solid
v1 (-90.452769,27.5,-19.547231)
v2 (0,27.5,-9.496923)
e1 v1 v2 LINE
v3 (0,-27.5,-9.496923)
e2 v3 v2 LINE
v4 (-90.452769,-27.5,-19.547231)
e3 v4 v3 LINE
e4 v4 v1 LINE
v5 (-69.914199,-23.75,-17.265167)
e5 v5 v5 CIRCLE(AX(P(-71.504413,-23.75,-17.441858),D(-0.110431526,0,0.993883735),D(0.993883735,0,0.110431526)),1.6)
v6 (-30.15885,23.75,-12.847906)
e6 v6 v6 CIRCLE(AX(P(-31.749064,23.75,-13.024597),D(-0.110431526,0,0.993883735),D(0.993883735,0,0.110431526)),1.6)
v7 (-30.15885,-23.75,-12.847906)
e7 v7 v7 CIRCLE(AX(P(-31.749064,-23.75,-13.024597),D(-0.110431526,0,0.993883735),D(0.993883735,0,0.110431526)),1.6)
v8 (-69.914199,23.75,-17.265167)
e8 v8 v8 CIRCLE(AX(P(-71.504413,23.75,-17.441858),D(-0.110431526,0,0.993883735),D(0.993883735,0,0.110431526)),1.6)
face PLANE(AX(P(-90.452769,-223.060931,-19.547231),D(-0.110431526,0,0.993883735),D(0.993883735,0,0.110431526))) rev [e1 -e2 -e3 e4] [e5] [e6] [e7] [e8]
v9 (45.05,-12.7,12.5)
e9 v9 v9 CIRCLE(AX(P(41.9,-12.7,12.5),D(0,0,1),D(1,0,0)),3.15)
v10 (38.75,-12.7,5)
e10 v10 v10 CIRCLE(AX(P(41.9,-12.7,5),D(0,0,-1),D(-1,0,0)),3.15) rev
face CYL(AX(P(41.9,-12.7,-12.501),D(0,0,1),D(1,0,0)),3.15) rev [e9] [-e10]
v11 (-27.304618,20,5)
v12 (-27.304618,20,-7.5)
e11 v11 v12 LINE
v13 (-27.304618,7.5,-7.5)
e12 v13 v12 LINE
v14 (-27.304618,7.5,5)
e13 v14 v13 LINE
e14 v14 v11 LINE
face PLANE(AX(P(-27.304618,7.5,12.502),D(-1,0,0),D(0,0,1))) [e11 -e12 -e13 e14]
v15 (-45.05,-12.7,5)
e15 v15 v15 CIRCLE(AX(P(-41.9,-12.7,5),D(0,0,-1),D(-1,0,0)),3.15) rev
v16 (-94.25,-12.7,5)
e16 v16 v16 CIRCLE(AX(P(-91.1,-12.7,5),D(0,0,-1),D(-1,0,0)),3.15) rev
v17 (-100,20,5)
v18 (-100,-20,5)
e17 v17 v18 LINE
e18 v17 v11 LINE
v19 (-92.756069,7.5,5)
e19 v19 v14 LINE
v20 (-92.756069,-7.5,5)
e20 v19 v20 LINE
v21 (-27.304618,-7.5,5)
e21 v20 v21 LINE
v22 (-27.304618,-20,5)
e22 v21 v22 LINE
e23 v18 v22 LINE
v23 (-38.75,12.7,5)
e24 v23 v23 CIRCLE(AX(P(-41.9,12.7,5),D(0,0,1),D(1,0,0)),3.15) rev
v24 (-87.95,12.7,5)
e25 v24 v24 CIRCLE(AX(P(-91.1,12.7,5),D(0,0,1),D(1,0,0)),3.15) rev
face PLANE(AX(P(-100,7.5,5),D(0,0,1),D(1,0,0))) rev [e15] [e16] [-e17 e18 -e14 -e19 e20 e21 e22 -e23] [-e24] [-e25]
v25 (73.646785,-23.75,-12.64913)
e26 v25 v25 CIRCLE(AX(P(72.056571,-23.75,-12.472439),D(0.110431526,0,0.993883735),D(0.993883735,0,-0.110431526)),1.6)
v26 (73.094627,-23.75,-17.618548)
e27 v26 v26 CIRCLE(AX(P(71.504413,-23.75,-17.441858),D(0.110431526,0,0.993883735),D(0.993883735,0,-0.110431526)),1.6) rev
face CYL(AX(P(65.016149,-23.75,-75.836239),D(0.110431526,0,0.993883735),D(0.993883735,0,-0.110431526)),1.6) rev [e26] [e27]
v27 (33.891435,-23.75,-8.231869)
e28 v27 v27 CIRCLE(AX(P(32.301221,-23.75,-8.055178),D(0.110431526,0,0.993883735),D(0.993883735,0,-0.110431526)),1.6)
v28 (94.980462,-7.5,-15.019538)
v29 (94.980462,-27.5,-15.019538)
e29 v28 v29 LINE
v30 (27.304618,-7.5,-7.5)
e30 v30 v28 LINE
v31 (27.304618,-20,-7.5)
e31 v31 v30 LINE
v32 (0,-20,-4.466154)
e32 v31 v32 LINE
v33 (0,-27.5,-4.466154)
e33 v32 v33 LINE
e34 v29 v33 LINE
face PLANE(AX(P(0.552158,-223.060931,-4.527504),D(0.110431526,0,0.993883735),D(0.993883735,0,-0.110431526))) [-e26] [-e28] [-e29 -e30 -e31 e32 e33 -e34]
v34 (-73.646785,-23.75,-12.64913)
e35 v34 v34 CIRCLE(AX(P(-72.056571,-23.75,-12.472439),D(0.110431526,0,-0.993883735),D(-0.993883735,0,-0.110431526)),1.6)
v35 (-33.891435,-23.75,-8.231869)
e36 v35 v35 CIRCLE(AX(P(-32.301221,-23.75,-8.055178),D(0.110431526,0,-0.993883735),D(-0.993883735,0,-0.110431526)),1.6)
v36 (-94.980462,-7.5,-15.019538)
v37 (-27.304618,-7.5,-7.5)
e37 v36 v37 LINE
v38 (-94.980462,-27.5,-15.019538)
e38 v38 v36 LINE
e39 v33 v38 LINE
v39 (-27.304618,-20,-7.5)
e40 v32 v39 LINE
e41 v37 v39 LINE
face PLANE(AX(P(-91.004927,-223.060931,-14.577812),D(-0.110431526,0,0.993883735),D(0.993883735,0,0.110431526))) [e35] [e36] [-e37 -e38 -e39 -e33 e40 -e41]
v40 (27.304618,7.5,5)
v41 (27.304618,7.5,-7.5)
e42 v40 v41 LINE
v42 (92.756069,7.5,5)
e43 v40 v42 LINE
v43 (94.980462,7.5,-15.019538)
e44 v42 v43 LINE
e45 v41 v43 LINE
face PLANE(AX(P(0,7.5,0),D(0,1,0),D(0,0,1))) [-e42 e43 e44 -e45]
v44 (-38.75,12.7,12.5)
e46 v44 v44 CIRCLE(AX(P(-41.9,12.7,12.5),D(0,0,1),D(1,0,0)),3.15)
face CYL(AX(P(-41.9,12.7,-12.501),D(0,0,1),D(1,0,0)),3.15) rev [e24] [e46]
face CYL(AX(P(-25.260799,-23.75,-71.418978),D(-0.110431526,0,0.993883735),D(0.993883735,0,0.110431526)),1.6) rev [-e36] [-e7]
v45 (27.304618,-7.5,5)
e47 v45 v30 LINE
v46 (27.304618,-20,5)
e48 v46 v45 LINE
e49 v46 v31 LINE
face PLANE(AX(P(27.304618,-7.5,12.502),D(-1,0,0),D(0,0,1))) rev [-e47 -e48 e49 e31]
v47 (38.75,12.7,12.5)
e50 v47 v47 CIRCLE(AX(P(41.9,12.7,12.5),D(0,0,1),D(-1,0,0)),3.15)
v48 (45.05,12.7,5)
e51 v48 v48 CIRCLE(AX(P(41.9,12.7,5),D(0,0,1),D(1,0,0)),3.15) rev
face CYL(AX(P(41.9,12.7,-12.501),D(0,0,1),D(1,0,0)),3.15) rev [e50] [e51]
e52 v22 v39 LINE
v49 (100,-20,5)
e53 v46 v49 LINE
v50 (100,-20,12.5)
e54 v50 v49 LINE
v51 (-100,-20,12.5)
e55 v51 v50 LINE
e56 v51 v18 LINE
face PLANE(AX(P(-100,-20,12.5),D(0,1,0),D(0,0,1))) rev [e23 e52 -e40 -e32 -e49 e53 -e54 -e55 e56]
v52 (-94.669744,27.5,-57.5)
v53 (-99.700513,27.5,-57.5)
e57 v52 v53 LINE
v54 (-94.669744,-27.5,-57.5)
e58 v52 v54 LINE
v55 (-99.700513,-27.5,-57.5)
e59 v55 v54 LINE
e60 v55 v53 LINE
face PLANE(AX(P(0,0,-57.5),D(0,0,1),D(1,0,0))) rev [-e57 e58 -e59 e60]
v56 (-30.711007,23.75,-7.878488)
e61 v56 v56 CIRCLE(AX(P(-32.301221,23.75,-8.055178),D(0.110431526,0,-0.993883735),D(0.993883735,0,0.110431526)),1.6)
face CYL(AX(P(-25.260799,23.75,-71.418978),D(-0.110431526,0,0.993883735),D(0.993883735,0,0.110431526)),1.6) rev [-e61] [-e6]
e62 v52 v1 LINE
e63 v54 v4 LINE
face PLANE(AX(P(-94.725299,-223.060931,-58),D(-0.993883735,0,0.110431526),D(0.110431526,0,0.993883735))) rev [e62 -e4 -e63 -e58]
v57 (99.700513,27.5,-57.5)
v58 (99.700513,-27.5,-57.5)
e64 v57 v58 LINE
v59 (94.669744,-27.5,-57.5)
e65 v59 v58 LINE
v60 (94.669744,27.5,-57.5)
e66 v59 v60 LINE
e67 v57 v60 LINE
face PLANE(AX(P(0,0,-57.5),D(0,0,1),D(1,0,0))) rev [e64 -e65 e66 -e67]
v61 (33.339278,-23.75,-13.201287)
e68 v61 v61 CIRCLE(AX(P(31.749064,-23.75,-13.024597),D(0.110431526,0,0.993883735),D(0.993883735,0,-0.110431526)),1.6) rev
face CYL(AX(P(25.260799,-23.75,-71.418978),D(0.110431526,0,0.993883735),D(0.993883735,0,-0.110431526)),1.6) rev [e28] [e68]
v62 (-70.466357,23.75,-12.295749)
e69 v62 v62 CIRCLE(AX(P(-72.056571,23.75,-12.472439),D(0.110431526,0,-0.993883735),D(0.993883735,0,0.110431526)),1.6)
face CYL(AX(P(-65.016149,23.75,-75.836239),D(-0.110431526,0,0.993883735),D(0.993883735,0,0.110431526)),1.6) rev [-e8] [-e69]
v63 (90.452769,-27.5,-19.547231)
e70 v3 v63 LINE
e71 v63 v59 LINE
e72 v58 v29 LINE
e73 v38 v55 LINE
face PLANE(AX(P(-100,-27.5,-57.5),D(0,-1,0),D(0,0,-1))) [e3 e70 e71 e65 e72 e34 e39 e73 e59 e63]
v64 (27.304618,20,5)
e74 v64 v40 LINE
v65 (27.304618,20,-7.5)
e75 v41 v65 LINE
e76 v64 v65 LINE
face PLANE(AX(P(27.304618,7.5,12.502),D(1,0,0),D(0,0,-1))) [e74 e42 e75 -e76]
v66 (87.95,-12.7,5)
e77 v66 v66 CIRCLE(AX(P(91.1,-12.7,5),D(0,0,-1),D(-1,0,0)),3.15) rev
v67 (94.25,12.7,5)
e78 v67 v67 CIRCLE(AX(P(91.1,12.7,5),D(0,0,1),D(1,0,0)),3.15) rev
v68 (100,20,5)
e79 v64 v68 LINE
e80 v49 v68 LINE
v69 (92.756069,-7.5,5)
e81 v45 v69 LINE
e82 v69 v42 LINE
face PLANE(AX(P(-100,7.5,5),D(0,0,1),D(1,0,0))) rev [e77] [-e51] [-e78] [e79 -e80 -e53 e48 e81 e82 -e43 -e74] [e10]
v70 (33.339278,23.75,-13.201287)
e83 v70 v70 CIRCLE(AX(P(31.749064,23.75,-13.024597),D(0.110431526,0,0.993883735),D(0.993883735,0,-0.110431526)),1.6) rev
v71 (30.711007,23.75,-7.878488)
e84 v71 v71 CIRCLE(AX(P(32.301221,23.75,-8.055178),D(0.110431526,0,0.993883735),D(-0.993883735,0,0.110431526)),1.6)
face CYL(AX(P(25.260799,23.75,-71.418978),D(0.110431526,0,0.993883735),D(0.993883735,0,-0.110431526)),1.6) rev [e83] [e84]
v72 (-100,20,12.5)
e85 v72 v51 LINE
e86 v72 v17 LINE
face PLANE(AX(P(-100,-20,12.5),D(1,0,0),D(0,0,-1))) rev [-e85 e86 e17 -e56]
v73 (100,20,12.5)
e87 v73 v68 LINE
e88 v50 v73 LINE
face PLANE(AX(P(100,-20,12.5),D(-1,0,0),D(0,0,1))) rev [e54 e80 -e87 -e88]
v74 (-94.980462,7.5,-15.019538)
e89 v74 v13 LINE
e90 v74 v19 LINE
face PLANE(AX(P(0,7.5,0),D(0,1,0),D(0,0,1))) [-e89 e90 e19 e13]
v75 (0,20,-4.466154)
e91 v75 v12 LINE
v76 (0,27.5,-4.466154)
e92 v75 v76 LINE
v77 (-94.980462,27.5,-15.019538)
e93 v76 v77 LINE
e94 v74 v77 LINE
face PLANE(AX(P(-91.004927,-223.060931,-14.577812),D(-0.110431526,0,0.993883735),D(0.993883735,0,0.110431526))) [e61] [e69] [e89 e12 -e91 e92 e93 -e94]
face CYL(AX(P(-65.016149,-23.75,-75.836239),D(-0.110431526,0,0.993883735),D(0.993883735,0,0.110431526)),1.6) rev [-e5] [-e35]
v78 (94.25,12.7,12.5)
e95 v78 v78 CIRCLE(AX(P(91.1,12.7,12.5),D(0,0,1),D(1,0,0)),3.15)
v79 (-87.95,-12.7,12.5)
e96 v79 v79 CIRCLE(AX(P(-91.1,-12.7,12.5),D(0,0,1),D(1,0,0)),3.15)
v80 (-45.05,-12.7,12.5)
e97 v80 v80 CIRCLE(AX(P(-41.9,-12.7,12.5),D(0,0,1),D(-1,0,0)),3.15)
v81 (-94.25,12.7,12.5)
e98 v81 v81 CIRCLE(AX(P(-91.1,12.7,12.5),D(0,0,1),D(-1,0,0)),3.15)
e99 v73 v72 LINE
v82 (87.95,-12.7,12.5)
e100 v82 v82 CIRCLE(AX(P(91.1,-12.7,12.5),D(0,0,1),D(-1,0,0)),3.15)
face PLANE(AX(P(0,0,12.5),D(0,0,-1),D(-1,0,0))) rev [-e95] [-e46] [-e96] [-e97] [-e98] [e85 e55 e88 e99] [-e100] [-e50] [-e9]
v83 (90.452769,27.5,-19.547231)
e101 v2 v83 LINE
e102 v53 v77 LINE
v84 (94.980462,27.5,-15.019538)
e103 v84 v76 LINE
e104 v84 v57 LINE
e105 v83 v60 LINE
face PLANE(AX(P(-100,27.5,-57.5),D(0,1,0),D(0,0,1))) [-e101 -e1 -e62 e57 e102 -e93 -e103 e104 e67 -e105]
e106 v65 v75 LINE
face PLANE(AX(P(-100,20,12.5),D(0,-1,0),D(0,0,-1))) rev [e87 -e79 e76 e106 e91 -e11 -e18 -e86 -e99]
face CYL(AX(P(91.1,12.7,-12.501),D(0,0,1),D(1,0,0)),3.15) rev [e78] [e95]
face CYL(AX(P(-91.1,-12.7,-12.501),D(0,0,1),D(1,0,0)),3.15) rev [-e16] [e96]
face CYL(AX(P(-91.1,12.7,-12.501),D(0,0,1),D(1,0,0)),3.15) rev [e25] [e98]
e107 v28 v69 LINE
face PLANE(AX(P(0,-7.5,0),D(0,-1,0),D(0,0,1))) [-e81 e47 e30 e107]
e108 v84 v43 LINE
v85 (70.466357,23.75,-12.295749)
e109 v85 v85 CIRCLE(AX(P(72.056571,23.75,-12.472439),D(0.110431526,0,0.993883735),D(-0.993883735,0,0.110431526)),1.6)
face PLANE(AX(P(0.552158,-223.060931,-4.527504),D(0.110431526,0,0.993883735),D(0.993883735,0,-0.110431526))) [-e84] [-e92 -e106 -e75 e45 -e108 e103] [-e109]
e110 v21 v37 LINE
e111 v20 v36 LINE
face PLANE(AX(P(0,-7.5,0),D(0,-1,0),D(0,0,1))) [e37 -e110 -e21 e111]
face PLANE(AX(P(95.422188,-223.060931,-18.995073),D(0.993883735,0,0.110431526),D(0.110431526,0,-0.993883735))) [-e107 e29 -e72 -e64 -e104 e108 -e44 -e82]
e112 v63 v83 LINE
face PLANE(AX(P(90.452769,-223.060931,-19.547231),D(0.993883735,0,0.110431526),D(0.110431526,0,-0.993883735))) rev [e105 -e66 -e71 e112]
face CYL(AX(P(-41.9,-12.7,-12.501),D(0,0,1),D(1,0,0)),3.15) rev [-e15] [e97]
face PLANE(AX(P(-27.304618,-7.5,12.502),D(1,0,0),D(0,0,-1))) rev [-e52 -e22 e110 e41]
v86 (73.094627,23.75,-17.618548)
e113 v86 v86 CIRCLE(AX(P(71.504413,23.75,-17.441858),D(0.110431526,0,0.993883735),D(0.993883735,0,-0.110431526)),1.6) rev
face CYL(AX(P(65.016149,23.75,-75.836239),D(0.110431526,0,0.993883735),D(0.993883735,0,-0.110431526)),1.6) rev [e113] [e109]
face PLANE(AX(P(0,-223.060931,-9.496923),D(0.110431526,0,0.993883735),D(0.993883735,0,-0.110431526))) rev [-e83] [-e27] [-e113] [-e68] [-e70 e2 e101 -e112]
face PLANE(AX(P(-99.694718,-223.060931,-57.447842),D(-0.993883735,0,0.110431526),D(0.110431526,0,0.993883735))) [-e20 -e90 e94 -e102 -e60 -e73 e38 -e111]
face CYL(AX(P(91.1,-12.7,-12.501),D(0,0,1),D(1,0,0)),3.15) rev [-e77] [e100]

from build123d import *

# Parameters (mm, degrees)
SKETCH1_W                        = 200
SKETCH1_H                        = 40
BOSS_EXTRUDE1_DEPTH              = 12.5
SKETCH3_W                        = 200
SKETCH3_H                        = 12.5
CUT_EXTRUDE1_DEPTH               = 12.5
CUT_EXTRUDE2_REACH               = 107
SKETCH2_R                        = 3.15
SKETCH5_W                        = 200
SKETCH5_H                        = 55
BOSS_EXTRUDE2_DEPTH              = 50
CAVITY1_START                    = -21.65
CAVITY1_DEPTH                    = 43.2999999
CAVITY1_START_2                  = 25.85
CAVITY1_2_DEPTH                  = 1.65
CAVITY1_START_3                  = -27.5
CAVITY1_3_DEPTH                  = 1.6499999
CAVITY1_START_4                  = -25.8500001
CAVITY1_4_DEPTH                  = 51.7000001
CUT_EXTRUDE11_DEPTH              = 55
CUT_EXTRUDE6_REACH               = 216.911
CUT_EXTRUDE6_OFFSET_FROM_SURFACE = 5
SKETCH8_W                        = 62.5
SKETCH8_H                        = 55
CUT_EXTRUDE7_REACH               = 122.136
CUT_EXTRUDE7_OFFSET_FROM_SURFACE = 5
SKETCH9_W                        = 199.70051314
SKETCH9_H                        = 20
CUT_EXTRUDE8_REACH               = 216.911
CUT_EXTRUDE8_OFFSET_FROM_SURFACE = 5
SKETCH11_W                       = 62.5
SKETCH11_H                       = 55
CUT_EXTRUDE9_REACH               = 122.136
CUT_EXTRUDE9_OFFSET_FROM_SURFACE = 5
SKETCH9_2_W                      = 199.70051314
SKETCH9_2_H                      = 20
BOSS_EXTRUDE4_REACH              = 117.136
SKETCH12_W                       = 54.60923652
SKETCH12_H                       = 12.5
BOSS_EXTRUDE5_REACH              = 129.794
CUT_EXTRUDE10_REACH              = 118.931
SKETCH15_R                       = 1.6


with BuildPart() as part:
    # Sketch1 → Boss-Extrude1 (new, symmetric)
    with BuildSketch(Plane.XY):
        Rectangle(SKETCH1_W, SKETCH1_H)
    extrude(amount=BOSS_EXTRUDE1_DEPTH, both=True)

    # Sketch3 → Cut-Extrude1 (cut)
    with BuildSketch(Plane(origin=(0, 20, 0), x_dir=(1, 0, 0), z_dir=(0, 1, 0))):
        with Locations((0, 1.25)):
            Rectangle(SKETCH3_W, SKETCH3_H)
    cut_extrude1 = extrude(amount=-CUT_EXTRUDE1_DEPTH, mode=Mode.SUBTRACT)

    # Mirror1: Cut-Extrude1 across plane
    add(cut_extrude1.mirror(Plane.ZX), mode=Mode.SUBTRACT)

    # Sketch2 → Cut-Extrude2 (cut, up to next)
    with BuildSketch(Plane.XY.offset(12.5), mode=Mode.PRIVATE) as cut_extrude2_sk1:
        with Locations((-91.1, -12.7)):
            Circle(SKETCH2_R)
    cut_extrude2_tool1 = extrude(cut_extrude2_sk1.sketch, amount=-CUT_EXTRUDE2_REACH, mode=Mode.PRIVATE) & part.part
    # Sketch2 → Cut-Extrude2 (cut, up to next)
    with BuildSketch(Plane.XY.offset(12.5), mode=Mode.PRIVATE) as cut_extrude2_sk2:
        with Locations(Location((-41.9, -12.7, 0), (0, 0, 180))):
            Circle(SKETCH2_R)
    cut_extrude2_tool2 = extrude(cut_extrude2_sk2.sketch, amount=-CUT_EXTRUDE2_REACH, mode=Mode.PRIVATE) & part.part
    # Sketch2 → Cut-Extrude2 (cut, up to next)
    with BuildSketch(Plane.XY.offset(12.5), mode=Mode.PRIVATE) as cut_extrude2_sk3:
        with Locations((-41.9, 12.7)):
            Circle(SKETCH2_R)
    cut_extrude2_tool3 = extrude(cut_extrude2_sk3.sketch, amount=-CUT_EXTRUDE2_REACH, mode=Mode.PRIVATE) & part.part
    # Sketch2 → Cut-Extrude2 (cut, up to next)
    with BuildSketch(Plane.XY.offset(12.5), mode=Mode.PRIVATE) as cut_extrude2_sk4:
        with Locations((-91.1, 12.7)):
            Circle(SKETCH2_R)
    cut_extrude2_tool4 = extrude(cut_extrude2_sk4.sketch, amount=-CUT_EXTRUDE2_REACH, mode=Mode.PRIVATE) & part.part
    # Sketch2 → Cut-Extrude2 (cut, up to next)
    with BuildSketch(Plane.XY.offset(12.5), mode=Mode.PRIVATE) as cut_extrude2_sk5:
        with Locations((41.9, -12.7)):
            Circle(SKETCH2_R)
    cut_extrude2_tool5 = extrude(cut_extrude2_sk5.sketch, amount=-CUT_EXTRUDE2_REACH, mode=Mode.PRIVATE) & part.part
    # Sketch2 → Cut-Extrude2 (cut, up to next)
    with BuildSketch(Plane.XY.offset(12.5), mode=Mode.PRIVATE) as cut_extrude2_sk6:
        with Locations(Location((91.1, -12.7, 0), (0, 0, 180))):
            Circle(SKETCH2_R)
    cut_extrude2_tool6 = extrude(cut_extrude2_sk6.sketch, amount=-CUT_EXTRUDE2_REACH, mode=Mode.PRIVATE) & part.part
    # Sketch2 → Cut-Extrude2 (cut, up to next)
    with BuildSketch(Plane.XY.offset(12.5), mode=Mode.PRIVATE) as cut_extrude2_sk7:
        with Locations((91.1, 12.7)):
            Circle(SKETCH2_R)
    cut_extrude2_tool7 = extrude(cut_extrude2_sk7.sketch, amount=-CUT_EXTRUDE2_REACH, mode=Mode.PRIVATE) & part.part
    # Sketch2 → Cut-Extrude2 (cut, up to next)
    with BuildSketch(Plane.XY.offset(12.5), mode=Mode.PRIVATE) as cut_extrude2_sk8:
        with Locations((41.9, 12.7)):
            Circle(SKETCH2_R)
    cut_extrude2_tool8 = extrude(cut_extrude2_sk8.sketch, amount=-CUT_EXTRUDE2_REACH, mode=Mode.PRIVATE) & part.part
    add(cut_extrude2_tool1.solids().sort_by_distance((-91.1, -12.7, 12.5))[0], mode=Mode.SUBTRACT)
    add(cut_extrude2_tool2.solids().sort_by_distance((-41.9, -12.7, 12.5))[0], mode=Mode.SUBTRACT)
    add(cut_extrude2_tool3.solids().sort_by_distance((-41.9, 12.7, 12.5))[0], mode=Mode.SUBTRACT)
    add(cut_extrude2_tool4.solids().sort_by_distance((-91.1, 12.7, 12.5))[0], mode=Mode.SUBTRACT)
    add(cut_extrude2_tool5.solids().sort_by_distance((41.9, -12.7, 12.5))[0], mode=Mode.SUBTRACT)
    add(cut_extrude2_tool6.solids().sort_by_distance((91.1, -12.7, 12.5))[0], mode=Mode.SUBTRACT)
    add(cut_extrude2_tool7.solids().sort_by_distance((91.1, 12.7, 12.5))[0], mode=Mode.SUBTRACT)
    add(cut_extrude2_tool8.solids().sort_by_distance((41.9, 12.7, 12.5))[0], mode=Mode.SUBTRACT)

    # Sketch5 → Boss-Extrude2 (add)
    with BuildSketch(Plane.XY.offset(-7.5)):
        Rectangle(SKETCH5_W, SKETCH5_H)
    extrude(amount=-BOSS_EXTRUDE2_DEPTH)

    # Cavity1: read off the stored shape, not the designer's step
    # Cavity1 outline → Cavity1 (cut)
    with BuildSketch(Plane(origin=(0, 0, 0), x_dir=(1, 0, 0), z_dir=(0, 1, 0)).offset(CAVITY1_START)):
        Polygon((94.166666667, 57.5), (-94.166666667, 57.5), (-90, 20), (0, 10), (90, 20), align=None)
    extrude(amount=CAVITY1_DEPTH, mode=Mode.SUBTRACT)

    # Cavity1 2 outline → Cavity1 2 (cut)
    with BuildSketch(Plane(origin=(0, 0, 0), x_dir=(1, 0, 0), z_dir=(0, 1, 0)).offset(CAVITY1_START_2)):
        Polygon((94.166666667, 57.5), (-94.166666667, 57.5), (-90, 20), (0, 10), (90, 20), align=None)
    extrude(amount=CAVITY1_2_DEPTH, mode=Mode.SUBTRACT)

    # Cavity1 3 outline → Cavity1 3 (cut)
    with BuildSketch(Plane(origin=(0, 0, 0), x_dir=(1, 0, 0), z_dir=(0, 1, 0)).offset(CAVITY1_START_3)):
        Polygon((94.166666667, 57.5), (-94.166666667, 57.5), (-90, 20), (0, 10), (90, 20), align=None)
    extrude(amount=CAVITY1_3_DEPTH, mode=Mode.SUBTRACT)

    # Cavity1 4 outline → Cavity1 4 (cut)
    with BuildSketch(Plane(origin=(0, 0, 0), x_dir=(1, 0, 0), z_dir=(0, 1, 0)).offset(CAVITY1_START_4)):
        Polygon((94.166666667, 57.5), (-94.166666667, 57.5), (-90, 20), (0, 10), (90, 20), align=None)
    extrude(amount=CAVITY1_4_DEPTH, mode=Mode.SUBTRACT)

    # Cavity1 5: loft between two sections, ruled curve by curve
    cavity1_5_from = [
        Edge.make_three_point_arc((-32.731904329, 23.75, -23.698417301), (-30.644748486, 21.65, -23.466511096), (-28.557592643, 23.75, -23.234604892)),
        Edge.make_three_point_arc((-28.557592643, 23.75, -23.234604892), (-30.644748486, 25.85, -23.466511096), (-32.731904329, 23.75, -23.698417301)),
    ]
    cavity1_5_to = [
        Edge.make_three_point_arc((-33.836219589, 23.75, -13.759579954), (-31.749063747, 21.65, -13.52767375), (-29.661907904, 23.75, -13.295767545)),
        Edge.make_three_point_arc((-29.661907904, 23.75, -13.295767545), (-31.749063747, 25.85, -13.52767375), (-33.836219589, 23.75, -13.759579954)),
    ]
    cavity1_5 = Solid(Shell([*[Face.make_surface_from_curves(cavity1_5_from[k], cavity1_5_to[k]) for k in range(2)], Face(Wire(cavity1_5_from)), Face(Wire(cavity1_5_to))]))
    add(cavity1_5)

    # Cavity1 6: loft between two sections, ruled curve by curve
    cavity1_6_from = [
        Edge.make_three_point_arc((-32.731904329, -23.75, -23.698417301), (-30.644748486, -25.85, -23.466511096), (-28.557592643, -23.75, -23.234604892)),
        Edge.make_three_point_arc((-28.557592643, -23.75, -23.234604892), (-30.644748486, -21.65, -23.466511096), (-32.731904329, -23.75, -23.698417301)),
    ]
    cavity1_6_to = [
        Edge.make_three_point_arc((-33.836219589, -23.75, -13.759579954), (-31.749063747, -25.85, -13.52767375), (-29.661907904, -23.75, -13.295767545)),
        Edge.make_three_point_arc((-29.661907904, -23.75, -13.295767545), (-31.749063747, -21.65, -13.52767375), (-33.836219589, -23.75, -13.759579954)),
    ]
    cavity1_6 = Solid(Shell([*[Face.make_surface_from_curves(cavity1_6_from[k], cavity1_6_to[k]) for k in range(2)], Face(Wire(cavity1_6_from)), Face(Wire(cavity1_6_to))]))
    add(cavity1_6)

    # Cavity1 7: loft between two sections, ruled curve by curve
    cavity1_7_from = [
        Edge.make_three_point_arc((-72.487253716, 23.75, -28.115678344), (-70.400097873, 21.65, -27.883772139), (-68.31294203, 23.75, -27.651865935)),
        Edge.make_three_point_arc((-68.31294203, 23.75, -27.651865935), (-70.400097873, 25.85, -27.883772139), (-72.487253716, 23.75, -28.115678344)),
    ]
    cavity1_7_to = [
        Edge.make_three_point_arc((-73.591568976, 23.75, -18.176840997), (-71.504413133, 21.65, -17.944934793), (-69.417257291, 23.75, -17.713028588)),
        Edge.make_three_point_arc((-69.417257291, 23.75, -17.713028588), (-71.504413133, 25.85, -17.944934793), (-73.591568976, 23.75, -18.176840997)),
    ]
    cavity1_7 = Solid(Shell([*[Face.make_surface_from_curves(cavity1_7_from[k], cavity1_7_to[k]) for k in range(2)], Face(Wire(cavity1_7_from)), Face(Wire(cavity1_7_to))]))
    add(cavity1_7)

    # Cavity1 8: loft between two sections, ruled curve by curve
    cavity1_8_from = [
        Edge.make_three_point_arc((-72.487253716, -23.75, -28.115678344), (-70.400097873, -25.85, -27.883772139), (-68.31294203, -23.75, -27.651865935)),
        Edge.make_three_point_arc((-68.31294203, -23.75, -27.651865935), (-70.400097873, -21.65, -27.883772139), (-72.487253716, -23.75, -28.115678344)),
    ]
    cavity1_8_to = [
        Edge.make_three_point_arc((-73.591568976, -23.75, -18.176840997), (-71.504413133, -25.85, -17.944934793), (-69.417257291, -23.75, -17.713028588)),
        Edge.make_three_point_arc((-69.417257291, -23.75, -17.713028588), (-71.504413133, -21.65, -17.944934793), (-73.591568976, -23.75, -18.176840997)),
    ]
    cavity1_8 = Solid(Shell([*[Face.make_surface_from_curves(cavity1_8_from[k], cavity1_8_to[k]) for k in range(2)], Face(Wire(cavity1_8_from)), Face(Wire(cavity1_8_to))]))
    add(cavity1_8)

    # Cavity1 9: loft between two sections, ruled curve by curve
    cavity1_9_from = [
        Edge.make_three_point_arc((32.731904329, 23.75, -23.698417301), (30.644748486, 25.85, -23.466511096), (28.557592643, 23.75, -23.234604892)),
        Edge.make_three_point_arc((28.557592643, 23.75, -23.234604892), (30.644748486, 21.65, -23.466511096), (32.731904329, 23.75, -23.698417301)),
    ]
    cavity1_9_to = [
        Edge.make_three_point_arc((33.836219589, 23.75, -13.759579954), (31.749063747, 25.85, -13.52767375), (29.661907904, 23.75, -13.295767545)),
        Edge.make_three_point_arc((29.661907904, 23.75, -13.295767545), (31.749063747, 21.65, -13.52767375), (33.836219589, 23.75, -13.759579954)),
    ]
    cavity1_9 = Solid(Shell([*[Face.make_surface_from_curves(cavity1_9_from[k], cavity1_9_to[k]) for k in range(2)], Face(Wire(cavity1_9_from)), Face(Wire(cavity1_9_to))]))
    add(cavity1_9)

    # Cavity1 10: loft between two sections, ruled curve by curve
    cavity1_10_from = [
        Edge.make_three_point_arc((32.731904329, -23.75, -23.698417301), (30.644748486, -21.65, -23.466511096), (28.557592643, -23.75, -23.234604892)),
        Edge.make_three_point_arc((28.557592643, -23.75, -23.234604892), (30.644748486, -25.85, -23.466511096), (32.731904329, -23.75, -23.698417301)),
    ]
    cavity1_10_to = [
        Edge.make_three_point_arc((33.836219589, -23.75, -13.759579954), (31.749063747, -21.65, -13.52767375), (29.661907904, -23.75, -13.295767545)),
        Edge.make_three_point_arc((29.661907904, -23.75, -13.295767545), (31.749063747, -25.85, -13.52767375), (33.836219589, -23.75, -13.759579954)),
    ]
    cavity1_10 = Solid(Shell([*[Face.make_surface_from_curves(cavity1_10_from[k], cavity1_10_to[k]) for k in range(2)], Face(Wire(cavity1_10_from)), Face(Wire(cavity1_10_to))]))
    add(cavity1_10)

    # Cavity1 11: loft between two sections, ruled curve by curve
    cavity1_11_from = [
        Edge.make_three_point_arc((72.487253716, 23.75, -28.115678344), (70.400097873, 25.85, -27.883772139), (68.31294203, 23.75, -27.651865935)),
        Edge.make_three_point_arc((68.31294203, 23.75, -27.651865935), (70.400097873, 21.65, -27.883772139), (72.487253716, 23.75, -28.115678344)),
    ]
    cavity1_11_to = [
        Edge.make_three_point_arc((73.591568976, 23.75, -18.176840997), (71.504413133, 25.85, -17.944934793), (69.417257291, 23.75, -17.713028588)),
        Edge.make_three_point_arc((69.417257291, 23.75, -17.713028588), (71.504413133, 21.65, -17.944934793), (73.591568976, 23.75, -18.176840997)),
    ]
    cavity1_11 = Solid(Shell([*[Face.make_surface_from_curves(cavity1_11_from[k], cavity1_11_to[k]) for k in range(2)], Face(Wire(cavity1_11_from)), Face(Wire(cavity1_11_to))]))
    add(cavity1_11)

    # Cavity1 12: loft between two sections, ruled curve by curve
    cavity1_12_from = [
        Edge.make_three_point_arc((72.487253716, -23.75, -28.115678344), (70.400097873, -21.65, -27.883772139), (68.31294203, -23.75, -27.651865935)),
        Edge.make_three_point_arc((68.31294203, -23.75, -27.651865935), (70.400097873, -25.85, -27.883772139), (72.487253716, -23.75, -28.115678344)),
    ]
    cavity1_12_to = [
        Edge.make_three_point_arc((73.591568976, -23.75, -18.176840997), (71.504413133, -21.65, -17.944934793), (69.417257291, -23.75, -17.713028588)),
        Edge.make_three_point_arc((69.417257291, -23.75, -17.713028588), (71.504413133, -25.85, -17.944934793), (73.591568976, -23.75, -18.176840997)),
    ]
    cavity1_12 = Solid(Shell([*[Face.make_surface_from_curves(cavity1_12_from[k], cavity1_12_to[k]) for k in range(2)], Face(Wire(cavity1_12_from)), Face(Wire(cavity1_12_to))]))
    add(cavity1_12)

    # Sketch16 → Cut-Extrude11 (cut)
    with BuildSketch(Plane(origin=(0, 27.5, 0), x_dir=(1, 0, 0), z_dir=(0, 1, 0))):
        Polygon((90.452769257, 19.547230743), (94.725299174, 58), (-94.725299174, 58), (-90.452769257, 19.547230743), (0, 9.496923048), align=None)
    extrude(amount=-CUT_EXTRUDE11_DEPTH, mode=Mode.SUBTRACT)

    # Cut-Extrude6: up to this face of the body (flat: up to its plane, moved by the offset)
    cut_extrude6_end = Plane(part.part.faces().sort_by_distance((-92.561256438, 0, -38.523615372))[0]).offset(-CUT_EXTRUDE6_OFFSET_FROM_SURFACE)
    # Sketch8 → Cut-Extrude6 (cut, up to the picked face)
    with BuildSketch(Plane.ZY.offset(100), mode=Mode.PRIVATE) as cut_extrude6_sk1:
        with Locations((-26.25, 0)):
            Rectangle(SKETCH8_W, SKETCH8_H)
    cut_extrude6_tool1 = split(extrude(cut_extrude6_sk1.sketch, amount=-CUT_EXTRUDE6_REACH, mode=Mode.PRIVATE), bisect_by=cut_extrude6_end, keep=Keep.BOTH, mode=Mode.PRIVATE)
    add(cut_extrude6_tool1.solids().sort_by(Axis((-100, 0, -26.25), (1, 0, 0)))[0], mode=Mode.SUBTRACT)

    # Cut-Extrude7: up to this face of the body (flat: up to its plane, moved by the offset)
    cut_extrude7_end = Plane(part.part.faces().sort_by_distance((-45.226384628, 0, -14.522076895))[0]).offset(-CUT_EXTRUDE7_OFFSET_FROM_SURFACE)
    # Sketch9 → Cut-Extrude7 (cut, up to the picked face)
    with BuildSketch(Plane.XY.offset(-7.5), mode=Mode.PRIVATE) as cut_extrude7_sk1:
        with Locations((0.14974343, -17.5)):
            Rectangle(SKETCH9_W, SKETCH9_H)
    cut_extrude7_tool1 = split(extrude(cut_extrude7_sk1.sketch, amount=-CUT_EXTRUDE7_REACH, mode=Mode.PRIVATE), bisect_by=cut_extrude7_end, keep=Keep.BOTH, mode=Mode.PRIVATE)
    cut_extrude7 = cut_extrude7_tool1.solids().sort_by(Axis((0.149743, -17.5, -7.5), (0, 0, -1)))[0]
    add(cut_extrude7, mode=Mode.SUBTRACT)

    # Cut-Extrude8: up to this face of the body (flat: up to its plane, moved by the offset)
    cut_extrude8_end = Plane(part.part.faces().sort_by_distance((92.561256438, 0, -38.523615372))[0]).offset(-CUT_EXTRUDE8_OFFSET_FROM_SURFACE)
    # Sketch11 → Cut-Extrude8 (cut, up to the picked face)
    with BuildSketch(Plane(origin=(100, 0, 0), x_dir=(0, 0, -1), z_dir=(1, 0, 0)), mode=Mode.PRIVATE) as cut_extrude8_sk1:
        with Locations((26.25, 0)):
            Rectangle(SKETCH11_W, SKETCH11_H)
    cut_extrude8_tool1 = split(extrude(cut_extrude8_sk1.sketch, amount=-CUT_EXTRUDE8_REACH, mode=Mode.PRIVATE), bisect_by=cut_extrude8_end, keep=Keep.BOTH, mode=Mode.PRIVATE)
    add(cut_extrude8_tool1.solids().sort_by(Axis((100, 0, -26.25), (-1, 0, 0)))[0], mode=Mode.SUBTRACT)

    # Cut-Extrude9: up to this face of the body (flat: up to its plane, moved by the offset)
    cut_extrude9_end = Plane(part.part.faces().sort_by_distance((45.226384628, 0, -14.522076895))[0]).offset(-CUT_EXTRUDE9_OFFSET_FROM_SURFACE)
    # Sketch9<2> → Cut-Extrude9 (cut, up to the picked face)
    with BuildSketch(Plane.XY.offset(-7.5), mode=Mode.PRIVATE) as cut_extrude9_sk1:
        with Locations((0.14974343, -17.5)):
            Rectangle(SKETCH9_2_W, SKETCH9_2_H)
    cut_extrude9_tool1 = split(extrude(cut_extrude9_sk1.sketch, amount=-CUT_EXTRUDE9_REACH, mode=Mode.PRIVATE), bisect_by=cut_extrude9_end, keep=Keep.BOTH, mode=Mode.PRIVATE)
    cut_extrude9 = cut_extrude9_tool1.solids().sort_by(Axis((0.149743, -17.5, -7.5), (0, 0, -1)))[0]
    add(cut_extrude9, mode=Mode.SUBTRACT)

    # Sketch12 → Boss-Extrude4 (add, up to next)
    with BuildSketch(Plane.XY.offset(-7.5), mode=Mode.PRIVATE) as boss_extrude4_sk1:
        with Locations((0, -13.75)):
            Rectangle(SKETCH12_W, SKETCH12_H)
    boss_extrude4_tool1 = extrude(boss_extrude4_sk1.sketch, amount=BOSS_EXTRUDE4_REACH, mode=Mode.PRIVATE) - part.part
    boss_extrude4 = boss_extrude4_tool1.solids().sort_by_distance((0, -13.75, -7.5))[0]
    add(boss_extrude4)

    # Sketch14 → Boss-Extrude5 (add, up to next)
    with BuildSketch(Plane.XZ.offset(27.5), mode=Mode.PRIVATE) as boss_extrude5_sk1:
        Polygon((-27.30461826, -7.5), (0, -4.466153527), (27.30461826, -7.5), align=None)
    boss_extrude5_tool1 = extrude(boss_extrude5_sk1.sketch, amount=-BOSS_EXTRUDE5_REACH, mode=Mode.PRIVATE) - part.part
    boss_extrude5 = boss_extrude5_tool1.solids().sort_by_distance((0, -27.5, -6.488718))[0]
    add(boss_extrude5)

    # Mirror7: Cut-Extrude7, Cut-Extrude9, Boss-Extrude4, Boss-Extrude5 across plane
    add(cut_extrude7.mirror(Plane.ZX), mode=Mode.SUBTRACT)
    add(cut_extrude9.mirror(Plane.ZX), mode=Mode.SUBTRACT)
    add(boss_extrude4.mirror(Plane.ZX))
    add(boss_extrude5.mirror(Plane.ZX))

    # Sketch15 → Cut-Extrude10 (cut, up to next)
    with BuildSketch(Plane(origin=(-0.490187582, 0, -4.41168824), x_dir=(0.9938837346736189, 0, -0.11043152607484641), z_dir=(0.11043152607484641, 0, 0.9938837346736189)), mode=Mode.PRIVATE) as cut_extrude10_sk1:
        with Locations((32.99320415, -23.75)):
            Circle(SKETCH15_R)
    cut_extrude10_tool1 = extrude(cut_extrude10_sk1.sketch, amount=-CUT_EXTRUDE10_REACH, mode=Mode.PRIVATE) & part.part
    # Sketch15 → Cut-Extrude10 (cut, up to next)
    with BuildSketch(Plane(origin=(-0.490187582, 0, -4.41168824), x_dir=(0.9938837346736189, 0, -0.11043152607484641), z_dir=(0.11043152607484641, 0, 0.9938837346736189)), mode=Mode.PRIVATE) as cut_extrude10_sk2:
        with Locations((72.99320415, -23.75)):
            Circle(SKETCH15_R)
    cut_extrude10_tool2 = extrude(cut_extrude10_sk2.sketch, amount=-CUT_EXTRUDE10_REACH, mode=Mode.PRIVATE) & part.part
    # Sketch15 → Cut-Extrude10 (cut, up to next)
    with BuildSketch(Plane(origin=(-0.490187582, 0, -4.41168824), x_dir=(0.9938837346736189, 0, -0.11043152607484641), z_dir=(0.11043152607484641, 0, 0.9938837346736189)), mode=Mode.PRIVATE) as cut_extrude10_sk3:
        with Locations((72.99320415, 23.75)):
            Circle(SKETCH15_R)
    cut_extrude10_tool3 = extrude(cut_extrude10_sk3.sketch, amount=-CUT_EXTRUDE10_REACH, mode=Mode.PRIVATE) & part.part
    # Sketch15 → Cut-Extrude10 (cut, up to next)
    with BuildSketch(Plane(origin=(-0.490187582, 0, -4.41168824), x_dir=(0.9938837346736189, 0, -0.11043152607484641), z_dir=(0.11043152607484641, 0, 0.9938837346736189)), mode=Mode.PRIVATE) as cut_extrude10_sk4:
        with Locations((32.99320415, 23.75)):
            Circle(SKETCH15_R)
    cut_extrude10_tool4 = extrude(cut_extrude10_sk4.sketch, amount=-CUT_EXTRUDE10_REACH, mode=Mode.PRIVATE) & part.part
    cut_extrude10_1 = cut_extrude10_tool1.solids().sort_by_distance((32.301221, -23.75, -8.055178))[0]
    add(cut_extrude10_1, mode=Mode.SUBTRACT)
    cut_extrude10_2 = cut_extrude10_tool2.solids().sort_by_distance((72.056571, -23.75, -12.472439))[0]
    add(cut_extrude10_2, mode=Mode.SUBTRACT)
    cut_extrude10_3 = cut_extrude10_tool3.solids().sort_by_distance((72.056571, 23.75, -12.472439))[0]
    add(cut_extrude10_3, mode=Mode.SUBTRACT)
    cut_extrude10_4 = cut_extrude10_tool4.solids().sort_by_distance((32.301221, 23.75, -8.055178))[0]
    add(cut_extrude10_4, mode=Mode.SUBTRACT)
    cut_extrude10 = cut_extrude10_1 + cut_extrude10_2 + cut_extrude10_3 + cut_extrude10_4  # Cut-Extrude10 as one shape, for the pattern or mirror that repeats it

    # Mirror8: Cut-Extrude10 across plane
    add(cut_extrude10.mirror(Plane(origin=(0, 0, 0), x_dir=(0, 0, 1), z_dir=(1, 0, 0))), mode=Mode.SUBTRACT)


solid = part.part
